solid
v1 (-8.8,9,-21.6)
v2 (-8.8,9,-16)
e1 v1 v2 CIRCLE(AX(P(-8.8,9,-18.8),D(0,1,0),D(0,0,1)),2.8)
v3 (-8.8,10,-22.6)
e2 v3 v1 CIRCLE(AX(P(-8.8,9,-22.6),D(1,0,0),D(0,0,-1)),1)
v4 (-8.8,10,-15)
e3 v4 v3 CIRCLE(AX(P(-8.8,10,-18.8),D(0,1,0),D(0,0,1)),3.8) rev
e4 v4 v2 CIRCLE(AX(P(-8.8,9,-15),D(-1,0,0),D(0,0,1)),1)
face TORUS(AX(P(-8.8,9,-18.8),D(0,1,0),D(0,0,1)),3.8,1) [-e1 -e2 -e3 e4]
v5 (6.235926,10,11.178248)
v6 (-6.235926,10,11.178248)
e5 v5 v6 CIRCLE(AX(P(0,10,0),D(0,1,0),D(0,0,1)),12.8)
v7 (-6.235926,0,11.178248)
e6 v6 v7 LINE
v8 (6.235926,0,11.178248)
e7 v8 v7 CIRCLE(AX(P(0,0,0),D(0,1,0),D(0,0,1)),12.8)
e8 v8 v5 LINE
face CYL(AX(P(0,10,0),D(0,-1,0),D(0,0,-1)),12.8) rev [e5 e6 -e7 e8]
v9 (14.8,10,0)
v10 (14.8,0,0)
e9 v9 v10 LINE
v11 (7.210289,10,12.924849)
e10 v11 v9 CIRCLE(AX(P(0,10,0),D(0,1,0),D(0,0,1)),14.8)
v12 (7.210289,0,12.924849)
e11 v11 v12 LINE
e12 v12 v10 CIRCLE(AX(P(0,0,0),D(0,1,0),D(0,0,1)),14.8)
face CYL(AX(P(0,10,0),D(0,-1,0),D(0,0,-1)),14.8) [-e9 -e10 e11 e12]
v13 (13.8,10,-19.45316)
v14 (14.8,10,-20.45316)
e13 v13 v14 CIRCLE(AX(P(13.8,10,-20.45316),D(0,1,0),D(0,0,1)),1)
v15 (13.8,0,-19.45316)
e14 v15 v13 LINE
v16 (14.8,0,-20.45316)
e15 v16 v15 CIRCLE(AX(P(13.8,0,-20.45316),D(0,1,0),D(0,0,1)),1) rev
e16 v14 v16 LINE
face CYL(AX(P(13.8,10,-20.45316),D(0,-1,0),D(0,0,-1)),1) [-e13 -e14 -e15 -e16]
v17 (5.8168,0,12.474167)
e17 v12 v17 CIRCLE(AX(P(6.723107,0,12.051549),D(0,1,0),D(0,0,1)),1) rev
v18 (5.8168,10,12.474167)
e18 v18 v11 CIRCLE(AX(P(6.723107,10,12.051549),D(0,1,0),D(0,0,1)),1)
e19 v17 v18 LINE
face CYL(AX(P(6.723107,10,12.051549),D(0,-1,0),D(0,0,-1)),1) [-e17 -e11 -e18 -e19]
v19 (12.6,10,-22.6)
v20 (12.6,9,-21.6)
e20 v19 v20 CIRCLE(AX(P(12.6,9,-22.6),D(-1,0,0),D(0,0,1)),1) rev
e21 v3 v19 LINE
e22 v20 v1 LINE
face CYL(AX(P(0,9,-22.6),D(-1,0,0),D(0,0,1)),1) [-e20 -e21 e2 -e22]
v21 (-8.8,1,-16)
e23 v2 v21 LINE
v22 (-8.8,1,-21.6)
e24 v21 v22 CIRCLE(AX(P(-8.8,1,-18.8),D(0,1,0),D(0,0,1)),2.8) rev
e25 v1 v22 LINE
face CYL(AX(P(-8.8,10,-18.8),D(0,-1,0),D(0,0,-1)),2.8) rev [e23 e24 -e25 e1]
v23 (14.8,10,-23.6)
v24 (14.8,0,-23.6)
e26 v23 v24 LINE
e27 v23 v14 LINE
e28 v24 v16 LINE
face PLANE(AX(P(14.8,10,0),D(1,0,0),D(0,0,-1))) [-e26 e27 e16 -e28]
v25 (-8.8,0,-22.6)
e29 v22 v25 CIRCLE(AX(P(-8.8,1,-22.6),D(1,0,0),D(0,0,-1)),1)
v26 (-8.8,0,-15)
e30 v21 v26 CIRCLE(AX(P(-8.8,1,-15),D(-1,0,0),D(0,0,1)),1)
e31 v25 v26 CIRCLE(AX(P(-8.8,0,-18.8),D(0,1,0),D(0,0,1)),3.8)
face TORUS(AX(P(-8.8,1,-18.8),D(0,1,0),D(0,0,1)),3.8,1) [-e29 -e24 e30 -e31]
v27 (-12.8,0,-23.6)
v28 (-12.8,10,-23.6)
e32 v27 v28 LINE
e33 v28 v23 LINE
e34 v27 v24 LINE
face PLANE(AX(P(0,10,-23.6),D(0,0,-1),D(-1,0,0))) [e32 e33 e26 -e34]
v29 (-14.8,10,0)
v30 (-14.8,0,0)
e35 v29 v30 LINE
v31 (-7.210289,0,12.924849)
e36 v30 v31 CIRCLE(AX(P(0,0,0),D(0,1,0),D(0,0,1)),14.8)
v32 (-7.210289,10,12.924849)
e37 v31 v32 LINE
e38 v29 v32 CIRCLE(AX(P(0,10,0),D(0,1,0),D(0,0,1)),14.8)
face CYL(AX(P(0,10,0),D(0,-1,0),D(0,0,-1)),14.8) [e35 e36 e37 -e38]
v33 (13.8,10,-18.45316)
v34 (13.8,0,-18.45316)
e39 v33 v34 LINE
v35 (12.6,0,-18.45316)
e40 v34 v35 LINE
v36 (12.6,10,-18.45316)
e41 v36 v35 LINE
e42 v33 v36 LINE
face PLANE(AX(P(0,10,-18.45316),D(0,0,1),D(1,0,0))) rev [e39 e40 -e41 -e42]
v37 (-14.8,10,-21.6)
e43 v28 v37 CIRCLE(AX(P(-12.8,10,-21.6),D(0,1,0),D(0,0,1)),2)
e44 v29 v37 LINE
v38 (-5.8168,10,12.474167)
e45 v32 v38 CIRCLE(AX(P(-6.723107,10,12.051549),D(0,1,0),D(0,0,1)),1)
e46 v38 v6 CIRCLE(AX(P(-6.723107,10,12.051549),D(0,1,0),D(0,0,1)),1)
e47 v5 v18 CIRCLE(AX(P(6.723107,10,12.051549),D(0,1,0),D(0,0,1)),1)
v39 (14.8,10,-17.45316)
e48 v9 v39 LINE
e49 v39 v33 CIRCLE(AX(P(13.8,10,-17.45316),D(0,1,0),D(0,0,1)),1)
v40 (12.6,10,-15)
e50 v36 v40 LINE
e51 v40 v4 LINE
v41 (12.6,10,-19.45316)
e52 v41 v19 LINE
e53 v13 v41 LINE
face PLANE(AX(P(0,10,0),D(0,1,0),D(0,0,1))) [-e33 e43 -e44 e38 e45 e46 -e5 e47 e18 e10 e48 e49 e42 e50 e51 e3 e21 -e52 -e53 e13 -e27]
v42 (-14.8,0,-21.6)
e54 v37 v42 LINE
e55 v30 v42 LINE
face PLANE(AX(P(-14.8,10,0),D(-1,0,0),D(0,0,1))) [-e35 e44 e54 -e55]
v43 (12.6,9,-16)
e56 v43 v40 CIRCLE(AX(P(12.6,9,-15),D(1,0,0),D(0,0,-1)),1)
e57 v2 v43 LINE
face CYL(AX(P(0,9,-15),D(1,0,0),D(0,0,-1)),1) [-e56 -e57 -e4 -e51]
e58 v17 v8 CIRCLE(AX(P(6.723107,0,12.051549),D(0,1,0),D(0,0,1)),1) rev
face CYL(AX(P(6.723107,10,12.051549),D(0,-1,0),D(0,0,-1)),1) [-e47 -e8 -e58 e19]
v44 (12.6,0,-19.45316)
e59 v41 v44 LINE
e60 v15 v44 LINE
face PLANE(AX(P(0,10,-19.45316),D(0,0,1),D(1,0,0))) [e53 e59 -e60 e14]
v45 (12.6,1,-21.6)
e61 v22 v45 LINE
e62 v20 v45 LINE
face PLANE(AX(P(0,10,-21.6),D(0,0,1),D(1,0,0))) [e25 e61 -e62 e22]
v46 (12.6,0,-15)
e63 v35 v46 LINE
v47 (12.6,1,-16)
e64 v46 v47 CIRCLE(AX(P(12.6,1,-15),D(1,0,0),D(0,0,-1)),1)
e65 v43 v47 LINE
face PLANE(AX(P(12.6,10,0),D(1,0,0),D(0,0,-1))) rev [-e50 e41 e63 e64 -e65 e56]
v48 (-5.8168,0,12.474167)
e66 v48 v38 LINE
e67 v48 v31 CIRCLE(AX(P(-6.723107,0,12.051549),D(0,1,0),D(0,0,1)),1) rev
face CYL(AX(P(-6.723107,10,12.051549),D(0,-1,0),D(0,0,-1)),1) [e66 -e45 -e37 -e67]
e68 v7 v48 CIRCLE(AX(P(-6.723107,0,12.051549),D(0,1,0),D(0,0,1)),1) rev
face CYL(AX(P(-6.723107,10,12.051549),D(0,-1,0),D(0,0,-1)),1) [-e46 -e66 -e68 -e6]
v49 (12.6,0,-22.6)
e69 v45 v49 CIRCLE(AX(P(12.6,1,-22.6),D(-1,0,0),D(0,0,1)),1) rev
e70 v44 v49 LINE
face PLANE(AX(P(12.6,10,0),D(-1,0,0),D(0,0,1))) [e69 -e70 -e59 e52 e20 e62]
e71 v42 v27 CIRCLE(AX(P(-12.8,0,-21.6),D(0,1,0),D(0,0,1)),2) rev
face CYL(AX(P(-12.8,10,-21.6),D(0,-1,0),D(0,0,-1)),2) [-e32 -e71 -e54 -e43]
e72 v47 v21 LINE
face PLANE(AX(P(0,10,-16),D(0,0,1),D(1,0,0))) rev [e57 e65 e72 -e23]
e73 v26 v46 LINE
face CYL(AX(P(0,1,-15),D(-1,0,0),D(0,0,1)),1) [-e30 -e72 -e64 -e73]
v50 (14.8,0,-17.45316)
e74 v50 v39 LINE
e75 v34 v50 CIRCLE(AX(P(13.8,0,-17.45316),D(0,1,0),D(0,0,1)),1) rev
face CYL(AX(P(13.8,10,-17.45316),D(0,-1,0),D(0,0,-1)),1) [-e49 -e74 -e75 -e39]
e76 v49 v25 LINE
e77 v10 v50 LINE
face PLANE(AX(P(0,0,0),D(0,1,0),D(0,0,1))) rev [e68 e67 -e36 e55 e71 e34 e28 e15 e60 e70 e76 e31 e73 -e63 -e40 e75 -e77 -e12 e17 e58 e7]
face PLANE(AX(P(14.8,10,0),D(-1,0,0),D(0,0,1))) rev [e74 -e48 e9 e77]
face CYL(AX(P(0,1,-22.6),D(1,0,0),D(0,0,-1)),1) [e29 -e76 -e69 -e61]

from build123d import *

# Parameters (mm, degrees)
BOSS_EXTRUDE1_DEPTH = 10
FILLET1_R           = 2
FILLET2_R           = 1


with BuildPart() as part:
    # Sketch2 → Boss-Extrude1 (new body)
    with BuildSketch(Plane(origin=(0, 0, 0), x_dir=(1, 0, 0), z_dir=(0, 1, 0))):
        with BuildLine():
            ThreePointArc((-14.8, 0), (-12.482193398, -7.952034204), (-6.254750274, -13.413355248))
            Line((-6.254750274, -13.413355248), (-5.40951375, -11.600739674))
            ThreePointArc((-5.40951375, -11.600739674), (0, 12.8), (5.40951375, -11.600739674))
            Line((5.40951375, -11.600739674), (6.254750274, -13.413355248))
            ThreePointArc((6.254750274, -13.413355248), (12.482193398, -7.952034204), (14.8, 0))
            Line((14.8, 0), (14.8, 18.453160221))
            Line((14.8, 18.453160221), (12.6, 18.453160221))
            Line((12.6, 18.453160221), (12.6, 16))
            Line((12.6, 16), (-8.8, 16))
            ThreePointArc((-8.8, 16), (-11.6, 18.8), (-8.8, 21.6))
            Line((-8.8, 21.6), (12.6, 21.6))
            Line((12.6, 21.6), (12.6, 19.453160221))
            Line((12.6, 19.453160221), (14.8, 19.453160221))
            Line((14.8, 19.453160221), (14.8, 23.6))
            Line((14.8, 23.6), (-14.8, 23.6))
            Line((-14.8, 23.6), (-14.8, 0))
        make_face()
    extrude(amount=BOSS_EXTRUDE1_DEPTH)

    # Fillet1
    fillet1_edges = [part.edges().sort_by_distance(p)[0] for p in [
        (-14.8, 5, -23.6),
    ]]
    fillet(fillet1_edges, radius=FILLET1_R)

    # Fillet2
    fillet2_edges = [part.edges().sort_by_distance(p)[0] for p in [
        (1.9, 0, -21.6),
        (1.9, 10, -21.6),
        (-11.6, 0, -18.8),
        (-11.6, 10, -18.8),
        (1.9, 0, -16),
        (1.9, 10, -16),
        (14.8, 5, -19.453160221),
        (14.8, 5, -18.453160221),
        (5.40951375, 5, 11.600739674),
        (6.254750274, 5, 13.413355248),
        (-6.254750274, 5, 13.413355248),
        (-5.40951375, 5, 11.600739674),
    ]]
    fillet(fillet2_edges, radius=FILLET2_R - 0.0001)  # a hair under: the kernel refuses the full size


solid = part.part
